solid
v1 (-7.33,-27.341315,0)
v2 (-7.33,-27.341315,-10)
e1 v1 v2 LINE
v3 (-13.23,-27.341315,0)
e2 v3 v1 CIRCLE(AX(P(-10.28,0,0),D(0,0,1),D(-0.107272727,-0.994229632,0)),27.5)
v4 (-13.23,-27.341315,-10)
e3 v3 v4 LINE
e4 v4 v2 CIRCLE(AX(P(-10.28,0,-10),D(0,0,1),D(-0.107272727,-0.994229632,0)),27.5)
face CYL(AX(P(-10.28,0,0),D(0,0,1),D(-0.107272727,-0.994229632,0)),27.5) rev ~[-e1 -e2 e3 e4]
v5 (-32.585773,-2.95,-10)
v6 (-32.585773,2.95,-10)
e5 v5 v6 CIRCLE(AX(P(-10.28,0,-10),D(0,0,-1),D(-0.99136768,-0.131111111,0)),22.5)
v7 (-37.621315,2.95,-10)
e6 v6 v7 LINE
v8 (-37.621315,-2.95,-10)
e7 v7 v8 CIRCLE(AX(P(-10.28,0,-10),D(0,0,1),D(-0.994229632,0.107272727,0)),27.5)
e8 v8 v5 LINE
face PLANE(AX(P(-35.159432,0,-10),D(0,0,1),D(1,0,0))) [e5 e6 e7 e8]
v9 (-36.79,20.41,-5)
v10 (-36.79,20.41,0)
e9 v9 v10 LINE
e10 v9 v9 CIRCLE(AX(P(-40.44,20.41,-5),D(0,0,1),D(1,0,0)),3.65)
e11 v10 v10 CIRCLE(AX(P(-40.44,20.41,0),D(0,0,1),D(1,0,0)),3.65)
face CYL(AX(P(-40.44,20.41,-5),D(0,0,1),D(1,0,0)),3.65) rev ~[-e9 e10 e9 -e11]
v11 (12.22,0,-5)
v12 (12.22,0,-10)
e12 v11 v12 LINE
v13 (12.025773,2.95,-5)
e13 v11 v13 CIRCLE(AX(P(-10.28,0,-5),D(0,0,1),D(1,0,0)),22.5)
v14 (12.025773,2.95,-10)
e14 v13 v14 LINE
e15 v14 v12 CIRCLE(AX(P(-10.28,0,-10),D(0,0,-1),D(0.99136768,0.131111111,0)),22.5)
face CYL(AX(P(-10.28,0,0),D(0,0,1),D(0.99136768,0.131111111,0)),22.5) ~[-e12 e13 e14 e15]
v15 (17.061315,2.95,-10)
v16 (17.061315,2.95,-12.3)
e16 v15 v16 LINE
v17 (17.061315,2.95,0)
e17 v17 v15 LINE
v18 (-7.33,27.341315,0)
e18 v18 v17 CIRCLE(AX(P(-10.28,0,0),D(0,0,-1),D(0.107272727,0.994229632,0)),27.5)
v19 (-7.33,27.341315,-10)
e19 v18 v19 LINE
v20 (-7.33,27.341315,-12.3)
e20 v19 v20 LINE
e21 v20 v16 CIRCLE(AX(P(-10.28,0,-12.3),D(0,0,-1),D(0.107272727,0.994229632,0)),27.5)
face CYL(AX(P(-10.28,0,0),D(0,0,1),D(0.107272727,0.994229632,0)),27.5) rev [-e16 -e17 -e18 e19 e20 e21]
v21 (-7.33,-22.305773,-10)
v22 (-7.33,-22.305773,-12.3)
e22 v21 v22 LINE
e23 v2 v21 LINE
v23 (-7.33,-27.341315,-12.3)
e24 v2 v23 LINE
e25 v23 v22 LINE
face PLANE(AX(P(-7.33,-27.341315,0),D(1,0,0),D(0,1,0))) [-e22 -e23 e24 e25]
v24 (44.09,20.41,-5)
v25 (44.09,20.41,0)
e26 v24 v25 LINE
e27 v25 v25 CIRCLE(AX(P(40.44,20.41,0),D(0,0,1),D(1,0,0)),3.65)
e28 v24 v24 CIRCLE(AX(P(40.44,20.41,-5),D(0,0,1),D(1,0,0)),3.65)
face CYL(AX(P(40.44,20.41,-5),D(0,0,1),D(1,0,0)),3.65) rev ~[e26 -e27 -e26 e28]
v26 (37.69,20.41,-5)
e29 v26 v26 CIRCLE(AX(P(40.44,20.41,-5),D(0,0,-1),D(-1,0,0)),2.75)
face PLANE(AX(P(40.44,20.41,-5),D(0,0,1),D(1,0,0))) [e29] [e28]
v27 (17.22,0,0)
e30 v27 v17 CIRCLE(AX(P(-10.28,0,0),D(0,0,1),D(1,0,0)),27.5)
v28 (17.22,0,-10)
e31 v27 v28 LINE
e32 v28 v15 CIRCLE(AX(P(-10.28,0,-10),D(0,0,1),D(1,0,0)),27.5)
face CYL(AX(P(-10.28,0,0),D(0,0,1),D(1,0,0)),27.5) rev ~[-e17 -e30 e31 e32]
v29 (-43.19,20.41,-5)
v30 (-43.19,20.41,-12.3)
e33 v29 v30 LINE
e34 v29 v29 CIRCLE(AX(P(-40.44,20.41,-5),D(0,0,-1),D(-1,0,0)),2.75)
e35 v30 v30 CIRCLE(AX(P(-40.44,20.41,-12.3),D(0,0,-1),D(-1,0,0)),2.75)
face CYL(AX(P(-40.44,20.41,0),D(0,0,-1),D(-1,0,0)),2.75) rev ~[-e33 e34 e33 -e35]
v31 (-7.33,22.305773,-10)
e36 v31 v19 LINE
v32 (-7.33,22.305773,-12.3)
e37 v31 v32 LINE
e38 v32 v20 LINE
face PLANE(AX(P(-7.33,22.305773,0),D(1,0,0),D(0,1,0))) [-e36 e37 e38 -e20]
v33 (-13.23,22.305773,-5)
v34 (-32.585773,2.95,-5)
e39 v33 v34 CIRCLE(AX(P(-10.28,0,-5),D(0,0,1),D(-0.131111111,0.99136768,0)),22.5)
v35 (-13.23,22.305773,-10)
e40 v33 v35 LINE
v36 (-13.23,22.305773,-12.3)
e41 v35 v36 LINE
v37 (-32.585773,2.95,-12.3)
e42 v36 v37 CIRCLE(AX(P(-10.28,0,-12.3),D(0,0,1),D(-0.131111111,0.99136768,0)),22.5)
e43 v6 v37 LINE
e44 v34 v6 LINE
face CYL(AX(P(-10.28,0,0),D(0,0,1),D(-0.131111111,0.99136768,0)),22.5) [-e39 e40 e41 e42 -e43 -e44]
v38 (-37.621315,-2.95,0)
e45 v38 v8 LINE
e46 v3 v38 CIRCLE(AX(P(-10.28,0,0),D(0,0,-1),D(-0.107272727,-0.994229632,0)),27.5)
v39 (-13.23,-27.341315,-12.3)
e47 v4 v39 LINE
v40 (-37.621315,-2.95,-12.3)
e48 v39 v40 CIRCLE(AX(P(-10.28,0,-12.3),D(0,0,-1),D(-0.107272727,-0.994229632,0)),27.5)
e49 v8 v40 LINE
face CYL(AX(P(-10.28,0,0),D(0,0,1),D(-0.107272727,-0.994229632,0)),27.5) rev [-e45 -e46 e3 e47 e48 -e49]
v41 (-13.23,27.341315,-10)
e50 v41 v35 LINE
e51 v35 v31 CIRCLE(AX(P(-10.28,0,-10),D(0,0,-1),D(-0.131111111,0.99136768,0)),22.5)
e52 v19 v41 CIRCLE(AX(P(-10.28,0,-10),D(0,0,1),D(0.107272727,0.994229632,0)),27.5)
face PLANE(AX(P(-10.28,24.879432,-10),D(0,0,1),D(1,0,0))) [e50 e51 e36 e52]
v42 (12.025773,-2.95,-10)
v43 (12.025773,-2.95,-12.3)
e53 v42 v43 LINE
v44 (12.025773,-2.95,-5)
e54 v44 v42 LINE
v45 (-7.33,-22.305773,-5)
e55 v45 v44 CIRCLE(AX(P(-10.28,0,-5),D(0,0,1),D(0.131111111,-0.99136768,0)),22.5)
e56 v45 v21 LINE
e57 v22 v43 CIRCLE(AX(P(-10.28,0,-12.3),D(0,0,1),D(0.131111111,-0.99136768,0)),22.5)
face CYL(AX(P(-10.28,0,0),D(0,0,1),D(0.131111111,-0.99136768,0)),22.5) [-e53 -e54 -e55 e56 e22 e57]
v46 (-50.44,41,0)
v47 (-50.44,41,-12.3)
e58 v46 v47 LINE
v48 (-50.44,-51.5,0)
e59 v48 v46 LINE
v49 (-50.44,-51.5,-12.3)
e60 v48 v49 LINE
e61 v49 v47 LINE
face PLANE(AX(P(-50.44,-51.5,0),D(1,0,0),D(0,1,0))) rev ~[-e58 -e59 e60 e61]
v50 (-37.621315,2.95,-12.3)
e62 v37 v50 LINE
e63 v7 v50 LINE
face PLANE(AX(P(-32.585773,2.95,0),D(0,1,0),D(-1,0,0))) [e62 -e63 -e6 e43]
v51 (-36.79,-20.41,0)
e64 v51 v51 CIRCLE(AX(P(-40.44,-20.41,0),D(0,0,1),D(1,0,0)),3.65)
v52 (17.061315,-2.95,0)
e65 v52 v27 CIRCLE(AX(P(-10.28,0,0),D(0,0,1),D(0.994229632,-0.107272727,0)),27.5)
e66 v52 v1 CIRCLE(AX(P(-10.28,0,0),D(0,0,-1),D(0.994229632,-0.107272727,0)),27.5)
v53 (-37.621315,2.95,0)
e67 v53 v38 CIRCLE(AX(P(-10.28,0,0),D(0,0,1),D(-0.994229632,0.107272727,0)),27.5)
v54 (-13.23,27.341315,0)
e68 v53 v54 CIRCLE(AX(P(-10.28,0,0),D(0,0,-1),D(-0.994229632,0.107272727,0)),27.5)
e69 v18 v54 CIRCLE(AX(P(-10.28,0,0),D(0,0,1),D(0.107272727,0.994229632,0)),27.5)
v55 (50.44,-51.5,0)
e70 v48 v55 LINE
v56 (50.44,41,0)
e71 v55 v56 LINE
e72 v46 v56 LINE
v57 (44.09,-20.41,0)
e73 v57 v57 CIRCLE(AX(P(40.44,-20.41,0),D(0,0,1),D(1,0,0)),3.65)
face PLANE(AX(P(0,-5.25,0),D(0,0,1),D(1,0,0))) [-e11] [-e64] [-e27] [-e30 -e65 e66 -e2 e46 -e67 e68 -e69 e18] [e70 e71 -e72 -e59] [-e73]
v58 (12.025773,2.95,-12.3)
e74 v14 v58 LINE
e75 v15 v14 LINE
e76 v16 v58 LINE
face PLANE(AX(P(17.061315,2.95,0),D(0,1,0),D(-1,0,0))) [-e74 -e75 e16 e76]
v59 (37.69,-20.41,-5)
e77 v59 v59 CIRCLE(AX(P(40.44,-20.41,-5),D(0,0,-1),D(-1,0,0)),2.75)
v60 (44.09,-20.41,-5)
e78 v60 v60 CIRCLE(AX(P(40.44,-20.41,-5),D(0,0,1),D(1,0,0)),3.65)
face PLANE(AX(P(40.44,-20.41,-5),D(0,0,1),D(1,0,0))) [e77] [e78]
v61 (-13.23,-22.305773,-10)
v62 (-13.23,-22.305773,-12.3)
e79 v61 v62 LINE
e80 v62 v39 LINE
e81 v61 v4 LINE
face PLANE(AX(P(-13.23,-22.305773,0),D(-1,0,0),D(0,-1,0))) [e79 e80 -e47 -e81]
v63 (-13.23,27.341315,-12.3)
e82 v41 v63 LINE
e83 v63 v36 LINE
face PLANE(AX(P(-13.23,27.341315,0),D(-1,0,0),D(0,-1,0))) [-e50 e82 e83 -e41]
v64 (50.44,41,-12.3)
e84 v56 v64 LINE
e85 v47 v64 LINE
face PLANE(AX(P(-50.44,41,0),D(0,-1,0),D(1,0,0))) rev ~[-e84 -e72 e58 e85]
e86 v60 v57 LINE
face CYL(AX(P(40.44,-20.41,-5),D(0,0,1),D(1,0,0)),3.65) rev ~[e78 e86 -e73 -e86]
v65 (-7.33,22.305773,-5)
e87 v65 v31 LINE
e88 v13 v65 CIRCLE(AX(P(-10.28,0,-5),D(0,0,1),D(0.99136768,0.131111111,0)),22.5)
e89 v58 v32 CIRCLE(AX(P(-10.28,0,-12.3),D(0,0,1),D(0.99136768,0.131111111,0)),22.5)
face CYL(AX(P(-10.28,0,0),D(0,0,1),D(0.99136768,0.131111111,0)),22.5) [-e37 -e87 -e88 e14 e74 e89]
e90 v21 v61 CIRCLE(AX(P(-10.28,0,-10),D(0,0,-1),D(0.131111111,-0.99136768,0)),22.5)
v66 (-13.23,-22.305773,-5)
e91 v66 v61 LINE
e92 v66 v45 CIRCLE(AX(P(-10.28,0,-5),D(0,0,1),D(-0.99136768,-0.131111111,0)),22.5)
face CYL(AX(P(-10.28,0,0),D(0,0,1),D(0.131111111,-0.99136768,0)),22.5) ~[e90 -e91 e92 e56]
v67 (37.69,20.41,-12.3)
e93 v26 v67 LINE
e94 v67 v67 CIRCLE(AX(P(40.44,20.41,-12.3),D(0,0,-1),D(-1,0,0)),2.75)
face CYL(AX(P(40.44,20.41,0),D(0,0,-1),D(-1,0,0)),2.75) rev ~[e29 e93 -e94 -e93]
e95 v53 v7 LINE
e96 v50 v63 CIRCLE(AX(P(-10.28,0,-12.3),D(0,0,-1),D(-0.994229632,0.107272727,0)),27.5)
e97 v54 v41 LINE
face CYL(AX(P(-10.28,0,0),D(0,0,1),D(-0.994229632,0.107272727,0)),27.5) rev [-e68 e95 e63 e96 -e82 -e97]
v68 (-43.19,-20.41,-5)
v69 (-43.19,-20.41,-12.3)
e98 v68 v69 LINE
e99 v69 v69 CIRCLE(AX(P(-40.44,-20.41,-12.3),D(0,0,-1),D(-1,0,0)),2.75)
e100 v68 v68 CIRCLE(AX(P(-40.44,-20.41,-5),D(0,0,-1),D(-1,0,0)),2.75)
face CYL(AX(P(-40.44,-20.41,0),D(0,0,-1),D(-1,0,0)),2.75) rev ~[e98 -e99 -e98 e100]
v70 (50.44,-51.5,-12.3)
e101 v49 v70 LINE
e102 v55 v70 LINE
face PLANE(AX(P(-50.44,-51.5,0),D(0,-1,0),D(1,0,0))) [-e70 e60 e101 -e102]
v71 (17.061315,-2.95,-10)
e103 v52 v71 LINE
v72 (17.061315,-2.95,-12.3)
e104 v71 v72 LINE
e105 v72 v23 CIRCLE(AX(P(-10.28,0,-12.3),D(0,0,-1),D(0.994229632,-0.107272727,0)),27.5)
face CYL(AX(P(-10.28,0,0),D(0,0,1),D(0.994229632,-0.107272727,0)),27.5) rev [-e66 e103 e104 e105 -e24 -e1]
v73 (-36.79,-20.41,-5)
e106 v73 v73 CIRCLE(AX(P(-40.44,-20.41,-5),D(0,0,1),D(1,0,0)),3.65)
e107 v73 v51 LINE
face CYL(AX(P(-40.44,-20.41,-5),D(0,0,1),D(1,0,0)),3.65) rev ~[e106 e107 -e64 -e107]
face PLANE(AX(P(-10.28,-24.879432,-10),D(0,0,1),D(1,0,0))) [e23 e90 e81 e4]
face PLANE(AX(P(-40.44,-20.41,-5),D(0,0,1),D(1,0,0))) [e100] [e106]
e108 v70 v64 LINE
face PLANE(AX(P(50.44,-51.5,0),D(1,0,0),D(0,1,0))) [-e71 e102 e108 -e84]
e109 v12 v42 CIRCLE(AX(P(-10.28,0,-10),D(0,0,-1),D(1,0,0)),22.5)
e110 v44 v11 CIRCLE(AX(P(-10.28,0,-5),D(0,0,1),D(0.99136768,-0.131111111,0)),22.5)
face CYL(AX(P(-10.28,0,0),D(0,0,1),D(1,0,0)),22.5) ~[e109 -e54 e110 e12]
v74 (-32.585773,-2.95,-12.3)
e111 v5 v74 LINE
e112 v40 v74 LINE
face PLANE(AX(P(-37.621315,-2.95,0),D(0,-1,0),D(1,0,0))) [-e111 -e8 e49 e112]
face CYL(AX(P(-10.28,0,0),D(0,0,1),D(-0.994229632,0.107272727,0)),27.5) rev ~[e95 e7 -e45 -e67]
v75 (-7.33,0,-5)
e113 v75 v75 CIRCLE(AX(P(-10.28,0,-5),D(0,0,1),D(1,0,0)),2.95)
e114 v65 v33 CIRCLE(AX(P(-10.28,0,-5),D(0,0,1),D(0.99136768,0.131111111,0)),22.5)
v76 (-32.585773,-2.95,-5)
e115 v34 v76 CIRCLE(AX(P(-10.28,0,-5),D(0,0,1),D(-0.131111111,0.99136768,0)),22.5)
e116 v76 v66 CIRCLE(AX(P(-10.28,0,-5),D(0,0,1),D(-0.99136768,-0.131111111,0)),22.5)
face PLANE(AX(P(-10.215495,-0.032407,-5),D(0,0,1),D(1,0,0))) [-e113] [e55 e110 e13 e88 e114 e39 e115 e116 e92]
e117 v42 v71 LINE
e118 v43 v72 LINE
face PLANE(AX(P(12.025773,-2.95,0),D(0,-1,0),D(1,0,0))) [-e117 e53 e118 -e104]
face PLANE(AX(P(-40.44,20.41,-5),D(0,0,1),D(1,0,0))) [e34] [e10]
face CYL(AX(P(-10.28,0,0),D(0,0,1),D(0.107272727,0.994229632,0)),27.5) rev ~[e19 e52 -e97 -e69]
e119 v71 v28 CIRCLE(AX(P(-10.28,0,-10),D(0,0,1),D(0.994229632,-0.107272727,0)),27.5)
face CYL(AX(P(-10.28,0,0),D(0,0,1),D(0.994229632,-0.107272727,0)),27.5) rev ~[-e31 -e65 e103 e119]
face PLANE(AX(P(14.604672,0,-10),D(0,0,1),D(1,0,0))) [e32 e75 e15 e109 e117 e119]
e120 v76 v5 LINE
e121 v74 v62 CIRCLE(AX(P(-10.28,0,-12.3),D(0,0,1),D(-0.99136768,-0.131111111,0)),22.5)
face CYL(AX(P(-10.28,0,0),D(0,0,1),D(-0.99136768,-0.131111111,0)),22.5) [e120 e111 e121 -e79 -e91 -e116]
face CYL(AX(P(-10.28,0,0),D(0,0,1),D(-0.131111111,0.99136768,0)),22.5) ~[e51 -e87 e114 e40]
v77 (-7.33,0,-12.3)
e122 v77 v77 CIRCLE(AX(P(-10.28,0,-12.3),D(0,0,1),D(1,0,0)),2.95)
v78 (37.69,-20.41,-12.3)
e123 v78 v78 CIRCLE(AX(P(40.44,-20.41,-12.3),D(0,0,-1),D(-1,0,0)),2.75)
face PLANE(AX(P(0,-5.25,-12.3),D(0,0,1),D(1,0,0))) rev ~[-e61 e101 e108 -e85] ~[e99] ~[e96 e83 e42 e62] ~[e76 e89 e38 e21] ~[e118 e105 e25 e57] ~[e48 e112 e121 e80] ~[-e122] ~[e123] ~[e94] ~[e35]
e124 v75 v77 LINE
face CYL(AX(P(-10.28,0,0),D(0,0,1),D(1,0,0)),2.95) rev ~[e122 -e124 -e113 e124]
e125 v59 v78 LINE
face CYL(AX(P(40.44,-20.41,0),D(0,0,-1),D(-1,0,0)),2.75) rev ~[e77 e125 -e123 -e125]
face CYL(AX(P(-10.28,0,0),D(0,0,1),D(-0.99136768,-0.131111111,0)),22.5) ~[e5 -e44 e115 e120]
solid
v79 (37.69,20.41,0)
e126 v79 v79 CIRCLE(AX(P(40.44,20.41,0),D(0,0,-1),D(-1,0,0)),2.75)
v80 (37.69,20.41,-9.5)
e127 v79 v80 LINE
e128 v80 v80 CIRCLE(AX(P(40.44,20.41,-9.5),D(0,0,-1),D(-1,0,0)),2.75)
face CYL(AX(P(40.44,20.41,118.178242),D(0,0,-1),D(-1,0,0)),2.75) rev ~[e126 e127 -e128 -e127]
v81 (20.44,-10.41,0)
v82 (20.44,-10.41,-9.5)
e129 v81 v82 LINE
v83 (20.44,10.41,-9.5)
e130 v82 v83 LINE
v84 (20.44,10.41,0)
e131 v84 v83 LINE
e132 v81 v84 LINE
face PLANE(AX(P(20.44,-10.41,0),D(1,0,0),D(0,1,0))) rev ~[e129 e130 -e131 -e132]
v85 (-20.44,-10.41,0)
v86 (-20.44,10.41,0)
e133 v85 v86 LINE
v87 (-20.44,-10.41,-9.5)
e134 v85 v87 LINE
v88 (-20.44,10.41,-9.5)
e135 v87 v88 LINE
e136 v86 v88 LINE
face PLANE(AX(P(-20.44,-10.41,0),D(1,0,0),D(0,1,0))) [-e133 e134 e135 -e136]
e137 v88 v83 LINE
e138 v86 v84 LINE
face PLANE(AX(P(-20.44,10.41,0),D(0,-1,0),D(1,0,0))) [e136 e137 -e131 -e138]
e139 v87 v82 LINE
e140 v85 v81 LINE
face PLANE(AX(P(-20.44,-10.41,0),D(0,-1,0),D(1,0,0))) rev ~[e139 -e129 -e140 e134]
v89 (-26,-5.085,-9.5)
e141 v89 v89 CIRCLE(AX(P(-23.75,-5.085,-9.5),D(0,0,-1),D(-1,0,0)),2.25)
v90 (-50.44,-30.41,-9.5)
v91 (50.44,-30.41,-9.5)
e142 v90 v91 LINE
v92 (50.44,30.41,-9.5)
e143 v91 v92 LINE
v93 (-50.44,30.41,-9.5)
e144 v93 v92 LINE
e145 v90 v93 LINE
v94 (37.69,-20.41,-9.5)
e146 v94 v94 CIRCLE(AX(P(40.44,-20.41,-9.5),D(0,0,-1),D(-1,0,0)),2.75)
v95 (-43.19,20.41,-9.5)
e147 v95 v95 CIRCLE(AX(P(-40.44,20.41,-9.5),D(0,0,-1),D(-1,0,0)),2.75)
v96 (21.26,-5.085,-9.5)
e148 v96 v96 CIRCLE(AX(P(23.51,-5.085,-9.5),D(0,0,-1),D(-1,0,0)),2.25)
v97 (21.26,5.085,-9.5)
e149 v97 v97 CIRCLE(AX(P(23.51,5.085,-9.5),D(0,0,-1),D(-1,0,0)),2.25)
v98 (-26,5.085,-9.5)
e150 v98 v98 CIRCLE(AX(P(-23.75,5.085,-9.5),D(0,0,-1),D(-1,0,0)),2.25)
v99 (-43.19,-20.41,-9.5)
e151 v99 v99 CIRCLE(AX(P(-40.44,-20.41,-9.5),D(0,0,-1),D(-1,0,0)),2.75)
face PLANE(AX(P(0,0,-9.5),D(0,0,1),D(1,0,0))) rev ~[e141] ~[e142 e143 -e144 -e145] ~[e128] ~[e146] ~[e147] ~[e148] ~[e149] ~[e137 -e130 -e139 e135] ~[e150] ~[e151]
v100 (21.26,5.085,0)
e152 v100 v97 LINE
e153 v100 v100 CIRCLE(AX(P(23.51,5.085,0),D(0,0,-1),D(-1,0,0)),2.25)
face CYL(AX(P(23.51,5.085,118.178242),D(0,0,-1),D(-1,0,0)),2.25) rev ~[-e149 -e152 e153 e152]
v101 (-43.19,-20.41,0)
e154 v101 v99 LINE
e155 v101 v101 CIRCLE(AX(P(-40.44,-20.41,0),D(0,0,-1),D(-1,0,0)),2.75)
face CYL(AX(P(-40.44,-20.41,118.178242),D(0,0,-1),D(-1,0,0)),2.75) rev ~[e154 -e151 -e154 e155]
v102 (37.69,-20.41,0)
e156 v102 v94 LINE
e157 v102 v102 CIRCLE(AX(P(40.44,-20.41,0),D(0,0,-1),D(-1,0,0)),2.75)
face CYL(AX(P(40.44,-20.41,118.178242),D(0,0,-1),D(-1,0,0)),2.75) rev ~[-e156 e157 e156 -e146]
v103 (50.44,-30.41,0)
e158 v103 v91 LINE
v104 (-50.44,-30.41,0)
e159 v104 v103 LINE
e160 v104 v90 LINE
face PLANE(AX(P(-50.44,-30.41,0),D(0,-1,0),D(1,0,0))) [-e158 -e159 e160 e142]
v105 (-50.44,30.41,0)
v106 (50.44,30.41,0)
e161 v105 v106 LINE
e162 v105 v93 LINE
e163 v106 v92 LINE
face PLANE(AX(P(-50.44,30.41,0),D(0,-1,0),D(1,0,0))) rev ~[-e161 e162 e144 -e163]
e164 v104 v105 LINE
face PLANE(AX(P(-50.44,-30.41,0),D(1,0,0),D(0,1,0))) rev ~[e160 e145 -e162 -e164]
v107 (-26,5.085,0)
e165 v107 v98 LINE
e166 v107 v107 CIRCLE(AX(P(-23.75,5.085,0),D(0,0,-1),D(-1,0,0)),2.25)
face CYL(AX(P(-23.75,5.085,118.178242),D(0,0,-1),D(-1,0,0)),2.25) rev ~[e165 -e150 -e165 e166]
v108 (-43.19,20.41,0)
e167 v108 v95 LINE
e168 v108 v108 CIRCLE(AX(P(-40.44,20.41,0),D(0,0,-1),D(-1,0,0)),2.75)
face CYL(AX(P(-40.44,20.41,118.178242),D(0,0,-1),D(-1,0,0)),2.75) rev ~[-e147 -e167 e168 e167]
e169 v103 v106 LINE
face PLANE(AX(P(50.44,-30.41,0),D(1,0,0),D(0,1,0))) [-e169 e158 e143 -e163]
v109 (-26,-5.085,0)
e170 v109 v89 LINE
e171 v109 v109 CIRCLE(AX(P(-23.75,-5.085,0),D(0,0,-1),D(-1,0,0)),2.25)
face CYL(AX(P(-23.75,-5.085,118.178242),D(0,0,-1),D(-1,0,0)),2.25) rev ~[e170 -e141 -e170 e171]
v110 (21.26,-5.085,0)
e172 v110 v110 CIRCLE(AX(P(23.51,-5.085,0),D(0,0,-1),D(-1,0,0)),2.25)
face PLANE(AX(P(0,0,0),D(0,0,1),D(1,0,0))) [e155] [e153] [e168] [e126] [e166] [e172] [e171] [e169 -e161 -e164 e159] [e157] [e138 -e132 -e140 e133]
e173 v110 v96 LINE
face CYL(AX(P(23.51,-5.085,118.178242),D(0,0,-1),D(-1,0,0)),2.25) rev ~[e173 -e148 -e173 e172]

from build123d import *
from build123d import SkipClean  # not in build123d's __all__

# Parameters (mm, degrees)
F1_W           = 100.88
F1_H           = 60.82
F1_W_2         = 40.88
F1_H_2         = 20.82
F2_DEPTH       = 9.5
F3_D           = 4.5
F4_D           = 5.5
F5_W           = 100.88
F5_H           = 92.5
F5_R           = 2.95
F6_DEPTH       = 12.3
F7_DEPTH       = 10
F8_DEPTH       = 5
F9_D           = 5.5
F9_CBORE_D     = 7.3
F9_CBORE_DEPTH = 5


with BuildPart() as f2:
    # F1 (on Top) → F2 (new body)
    with BuildSketch(Plane.XY):
        Rectangle(F1_W, F1_H)
        Rectangle(F1_W_2, F1_H_2, mode=Mode.SUBTRACT)
    extrude(amount=-F2_DEPTH)

    # F3 (through all)
    with Locations(Plane.XY):
        with Locations((-23.75, 5.085), (-23.75, -5.085), (23.51, -5.085), (23.51, 5.085), (23.51, -5.085)):
            Hole(F3_D / 2)

    # F4 (through all)
    with Locations(Plane.XY):
        with Locations((-40.44, 20.41), (-40.44, -20.41), (40.44, -20.41), (40.44, 20.41)):
            Hole(F4_D / 2)


with BuildPart() as f6:
    # F5 (on Top) → F6 (new body)
    with BuildSketch(Plane.XY):
        with Locations((0, -5.25)):
            Rectangle(F5_W, F5_H)
        with BuildLine():
            ThreePointArc((-7.33, 27.3413148916), (9.1654364826, 19.4454364826), (17.0613148916, 2.95))
            ThreePointArc((17.0613148916, 2.95), (17.1803000668, 1.4771324385), (17.22, 0))
            ThreePointArc((17.22, 0), (17.1803000668, -1.4771324385), (17.0613148916, -2.95))
            ThreePointArc((17.0613148916, -2.95), (9.1654364826, -19.4454364826), (-7.33, -27.3413148916))
            ThreePointArc((-7.33, -27.3413148916), (-10.28, -27.5), (-13.23, -27.3413148916))
            ThreePointArc((-13.23, -27.3413148916), (-29.7254364826, -19.4454364826), (-37.6213148916, -2.95))
            ThreePointArc((-37.6213148916, -2.95), (-37.78, 0), (-37.6213148916, 2.95))
            ThreePointArc((-37.6213148916, 2.95), (-29.7254364826, 19.4454364826), (-13.23, 27.3413148916))
            ThreePointArc((-13.23, 27.3413148916), (-10.28, 27.5), (-7.33, 27.3413148916))
        make_face(mode=Mode.SUBTRACT)
        with BuildLine():
            ThreePointArc((-32.5857727954, -2.95), (-32.78, 0), (-32.5857727954, 2.95))
            Line((-32.5857727954, 2.95), (-37.6213148916, 2.95))
            ThreePointArc((-37.6213148916, 2.95), (-37.78, 0), (-37.6213148916, -2.95))
            Line((-37.6213148916, -2.95), (-32.5857727954, -2.95))
        make_face()
        with BuildLine():
            ThreePointArc((12.0257727954, -2.95), (12.1713906907, -1.4781935096), (12.22, 0))
            ThreePointArc((12.22, 0), (12.1713906907, 1.4781935096), (12.0257727954, 2.95))
            ThreePointArc((12.0257727954, 2.95), (5.6299025767, 15.9099025767), (-7.33, 22.3057727954))
            ThreePointArc((-7.33, 22.3057727954), (-10.28, 22.5), (-13.23, 22.3057727954))
            ThreePointArc((-13.23, 22.3057727954), (-26.1899025767, 15.9099025767), (-32.5857727954, 2.95))
            ThreePointArc((-32.5857727954, 2.95), (-32.78, 0), (-32.5857727954, -2.95))
            ThreePointArc((-32.5857727954, -2.95), (-26.1899025767, -15.9099025767), (-13.23, -22.3057727954))
            ThreePointArc((-13.23, -22.3057727954), (-10.28, -22.5), (-7.33, -22.3057727954))
            ThreePointArc((-7.33, -22.3057727954), (5.6299025767, -15.9099025767), (12.0257727954, -2.95))
        make_face()
        with Locations((-10.28, 0)):
            Circle(F5_R, mode=Mode.SUBTRACT)
        with BuildLine():
            ThreePointArc((-13.23, 22.3057727954), (-10.28, 22.5), (-7.33, 22.3057727954))
            Line((-7.33, 22.3057727954), (-7.33, 27.3413148916))
            ThreePointArc((-7.33, 27.3413148916), (-10.28, 27.5), (-13.23, 27.3413148916))
            Line((-13.23, 27.3413148916), (-13.23, 22.3057727954))
        make_face()
        with BuildLine():
            ThreePointArc((12.0257727954, 2.95), (12.1713906907, 1.4781935096), (12.22, 0))
            ThreePointArc((12.22, 0), (12.1713906907, -1.4781935096), (12.0257727954, -2.95))
            Line((12.0257727954, -2.95), (17.0613148916, -2.95))
            ThreePointArc((17.0613148916, -2.95), (17.1803000668, -1.4771324385), (17.22, 0))
            ThreePointArc((17.22, 0), (17.1803000668, 1.4771324385), (17.0613148916, 2.95))
            Line((17.0613148916, 2.95), (12.0257727954, 2.95))
        make_face()
        with BuildLine():
            Line((-7.33, -27.3413148916), (-7.33, -22.3057727954))
            ThreePointArc((-7.33, -22.3057727954), (-10.28, -22.5), (-13.23, -22.3057727954))
            Line((-13.23, -22.3057727954), (-13.23, -27.3413148916))
            ThreePointArc((-13.23, -27.3413148916), (-10.28, -27.5), (-7.33, -27.3413148916))
        make_face()
    extrude(amount=-F6_DEPTH)

    # F5 (on Top) → F7 (cut)
    with BuildSketch(Plane.XY):
        with BuildLine():
            ThreePointArc((-13.23, 22.3057727954), (-10.28, 22.5), (-7.33, 22.3057727954))
            Line((-7.33, 22.3057727954), (-7.33, 27.3413148916))
            ThreePointArc((-7.33, 27.3413148916), (-10.28, 27.5), (-13.23, 27.3413148916))
            Line((-13.23, 27.3413148916), (-13.23, 22.3057727954))
        make_face()
        with BuildLine():
            ThreePointArc((-32.5857727954, -2.95), (-32.78, 0), (-32.5857727954, 2.95))
            Line((-32.5857727954, 2.95), (-37.6213148916, 2.95))
            ThreePointArc((-37.6213148916, 2.95), (-37.78, 0), (-37.6213148916, -2.95))
            Line((-37.6213148916, -2.95), (-32.5857727954, -2.95))
        make_face()
        with BuildLine():
            Line((-7.33, -27.3413148916), (-7.33, -22.3057727954))
            ThreePointArc((-7.33, -22.3057727954), (-10.28, -22.5), (-13.23, -22.3057727954))
            Line((-13.23, -22.3057727954), (-13.23, -27.3413148916))
            ThreePointArc((-13.23, -27.3413148916), (-10.28, -27.5), (-7.33, -27.3413148916))
        make_face()
        with BuildLine():
            ThreePointArc((12.0257727954, 2.95), (12.1713906907, 1.4781935096), (12.22, 0))
            ThreePointArc((12.22, 0), (12.1713906907, -1.4781935096), (12.0257727954, -2.95))
            Line((12.0257727954, -2.95), (17.0613148916, -2.95))
            ThreePointArc((17.0613148916, -2.95), (17.1803000668, -1.4771324385), (17.22, 0))
            ThreePointArc((17.22, 0), (17.1803000668, 1.4771324385), (17.0613148916, 2.95))
            Line((17.0613148916, 2.95), (12.0257727954, 2.95))
        make_face()
    with SkipClean():  # cleaning this boolean's faces spoils the solid; the shape is the same uncleaned
        extrude(amount=-F7_DEPTH, mode=Mode.SUBTRACT)

    # F5 (on Top) → F8 (cut)
    with BuildSketch(Plane.XY):
        with BuildLine():
            ThreePointArc((12.0257727954, -2.95), (12.1713906907, -1.4781935096), (12.22, 0))
            ThreePointArc((12.22, 0), (12.1713906907, 1.4781935096), (12.0257727954, 2.95))
            ThreePointArc((12.0257727954, 2.95), (5.6299025767, 15.9099025767), (-7.33, 22.3057727954))
            ThreePointArc((-7.33, 22.3057727954), (-10.28, 22.5), (-13.23, 22.3057727954))
            ThreePointArc((-13.23, 22.3057727954), (-26.1899025767, 15.9099025767), (-32.5857727954, 2.95))
            ThreePointArc((-32.5857727954, 2.95), (-32.78, 0), (-32.5857727954, -2.95))
            ThreePointArc((-32.5857727954, -2.95), (-26.1899025767, -15.9099025767), (-13.23, -22.3057727954))
            ThreePointArc((-13.23, -22.3057727954), (-10.28, -22.5), (-7.33, -22.3057727954))
            ThreePointArc((-7.33, -22.3057727954), (5.6299025767, -15.9099025767), (12.0257727954, -2.95))
        make_face()
        with Locations((-10.28, 0)):
            Circle(F5_R, mode=Mode.SUBTRACT)
    extrude(amount=-F8_DEPTH, mode=Mode.SUBTRACT)

    # F9 (through all)
    with Locations(Plane.XY):
        with Locations((-40.44, 20.41), (-40.44, -20.41), (40.44, -20.41), (40.44, 20.41)):
            CounterBoreHole(F9_D / 2, F9_CBORE_D / 2, F9_CBORE_DEPTH)


solid = Compound([f2.part, f6.part])
